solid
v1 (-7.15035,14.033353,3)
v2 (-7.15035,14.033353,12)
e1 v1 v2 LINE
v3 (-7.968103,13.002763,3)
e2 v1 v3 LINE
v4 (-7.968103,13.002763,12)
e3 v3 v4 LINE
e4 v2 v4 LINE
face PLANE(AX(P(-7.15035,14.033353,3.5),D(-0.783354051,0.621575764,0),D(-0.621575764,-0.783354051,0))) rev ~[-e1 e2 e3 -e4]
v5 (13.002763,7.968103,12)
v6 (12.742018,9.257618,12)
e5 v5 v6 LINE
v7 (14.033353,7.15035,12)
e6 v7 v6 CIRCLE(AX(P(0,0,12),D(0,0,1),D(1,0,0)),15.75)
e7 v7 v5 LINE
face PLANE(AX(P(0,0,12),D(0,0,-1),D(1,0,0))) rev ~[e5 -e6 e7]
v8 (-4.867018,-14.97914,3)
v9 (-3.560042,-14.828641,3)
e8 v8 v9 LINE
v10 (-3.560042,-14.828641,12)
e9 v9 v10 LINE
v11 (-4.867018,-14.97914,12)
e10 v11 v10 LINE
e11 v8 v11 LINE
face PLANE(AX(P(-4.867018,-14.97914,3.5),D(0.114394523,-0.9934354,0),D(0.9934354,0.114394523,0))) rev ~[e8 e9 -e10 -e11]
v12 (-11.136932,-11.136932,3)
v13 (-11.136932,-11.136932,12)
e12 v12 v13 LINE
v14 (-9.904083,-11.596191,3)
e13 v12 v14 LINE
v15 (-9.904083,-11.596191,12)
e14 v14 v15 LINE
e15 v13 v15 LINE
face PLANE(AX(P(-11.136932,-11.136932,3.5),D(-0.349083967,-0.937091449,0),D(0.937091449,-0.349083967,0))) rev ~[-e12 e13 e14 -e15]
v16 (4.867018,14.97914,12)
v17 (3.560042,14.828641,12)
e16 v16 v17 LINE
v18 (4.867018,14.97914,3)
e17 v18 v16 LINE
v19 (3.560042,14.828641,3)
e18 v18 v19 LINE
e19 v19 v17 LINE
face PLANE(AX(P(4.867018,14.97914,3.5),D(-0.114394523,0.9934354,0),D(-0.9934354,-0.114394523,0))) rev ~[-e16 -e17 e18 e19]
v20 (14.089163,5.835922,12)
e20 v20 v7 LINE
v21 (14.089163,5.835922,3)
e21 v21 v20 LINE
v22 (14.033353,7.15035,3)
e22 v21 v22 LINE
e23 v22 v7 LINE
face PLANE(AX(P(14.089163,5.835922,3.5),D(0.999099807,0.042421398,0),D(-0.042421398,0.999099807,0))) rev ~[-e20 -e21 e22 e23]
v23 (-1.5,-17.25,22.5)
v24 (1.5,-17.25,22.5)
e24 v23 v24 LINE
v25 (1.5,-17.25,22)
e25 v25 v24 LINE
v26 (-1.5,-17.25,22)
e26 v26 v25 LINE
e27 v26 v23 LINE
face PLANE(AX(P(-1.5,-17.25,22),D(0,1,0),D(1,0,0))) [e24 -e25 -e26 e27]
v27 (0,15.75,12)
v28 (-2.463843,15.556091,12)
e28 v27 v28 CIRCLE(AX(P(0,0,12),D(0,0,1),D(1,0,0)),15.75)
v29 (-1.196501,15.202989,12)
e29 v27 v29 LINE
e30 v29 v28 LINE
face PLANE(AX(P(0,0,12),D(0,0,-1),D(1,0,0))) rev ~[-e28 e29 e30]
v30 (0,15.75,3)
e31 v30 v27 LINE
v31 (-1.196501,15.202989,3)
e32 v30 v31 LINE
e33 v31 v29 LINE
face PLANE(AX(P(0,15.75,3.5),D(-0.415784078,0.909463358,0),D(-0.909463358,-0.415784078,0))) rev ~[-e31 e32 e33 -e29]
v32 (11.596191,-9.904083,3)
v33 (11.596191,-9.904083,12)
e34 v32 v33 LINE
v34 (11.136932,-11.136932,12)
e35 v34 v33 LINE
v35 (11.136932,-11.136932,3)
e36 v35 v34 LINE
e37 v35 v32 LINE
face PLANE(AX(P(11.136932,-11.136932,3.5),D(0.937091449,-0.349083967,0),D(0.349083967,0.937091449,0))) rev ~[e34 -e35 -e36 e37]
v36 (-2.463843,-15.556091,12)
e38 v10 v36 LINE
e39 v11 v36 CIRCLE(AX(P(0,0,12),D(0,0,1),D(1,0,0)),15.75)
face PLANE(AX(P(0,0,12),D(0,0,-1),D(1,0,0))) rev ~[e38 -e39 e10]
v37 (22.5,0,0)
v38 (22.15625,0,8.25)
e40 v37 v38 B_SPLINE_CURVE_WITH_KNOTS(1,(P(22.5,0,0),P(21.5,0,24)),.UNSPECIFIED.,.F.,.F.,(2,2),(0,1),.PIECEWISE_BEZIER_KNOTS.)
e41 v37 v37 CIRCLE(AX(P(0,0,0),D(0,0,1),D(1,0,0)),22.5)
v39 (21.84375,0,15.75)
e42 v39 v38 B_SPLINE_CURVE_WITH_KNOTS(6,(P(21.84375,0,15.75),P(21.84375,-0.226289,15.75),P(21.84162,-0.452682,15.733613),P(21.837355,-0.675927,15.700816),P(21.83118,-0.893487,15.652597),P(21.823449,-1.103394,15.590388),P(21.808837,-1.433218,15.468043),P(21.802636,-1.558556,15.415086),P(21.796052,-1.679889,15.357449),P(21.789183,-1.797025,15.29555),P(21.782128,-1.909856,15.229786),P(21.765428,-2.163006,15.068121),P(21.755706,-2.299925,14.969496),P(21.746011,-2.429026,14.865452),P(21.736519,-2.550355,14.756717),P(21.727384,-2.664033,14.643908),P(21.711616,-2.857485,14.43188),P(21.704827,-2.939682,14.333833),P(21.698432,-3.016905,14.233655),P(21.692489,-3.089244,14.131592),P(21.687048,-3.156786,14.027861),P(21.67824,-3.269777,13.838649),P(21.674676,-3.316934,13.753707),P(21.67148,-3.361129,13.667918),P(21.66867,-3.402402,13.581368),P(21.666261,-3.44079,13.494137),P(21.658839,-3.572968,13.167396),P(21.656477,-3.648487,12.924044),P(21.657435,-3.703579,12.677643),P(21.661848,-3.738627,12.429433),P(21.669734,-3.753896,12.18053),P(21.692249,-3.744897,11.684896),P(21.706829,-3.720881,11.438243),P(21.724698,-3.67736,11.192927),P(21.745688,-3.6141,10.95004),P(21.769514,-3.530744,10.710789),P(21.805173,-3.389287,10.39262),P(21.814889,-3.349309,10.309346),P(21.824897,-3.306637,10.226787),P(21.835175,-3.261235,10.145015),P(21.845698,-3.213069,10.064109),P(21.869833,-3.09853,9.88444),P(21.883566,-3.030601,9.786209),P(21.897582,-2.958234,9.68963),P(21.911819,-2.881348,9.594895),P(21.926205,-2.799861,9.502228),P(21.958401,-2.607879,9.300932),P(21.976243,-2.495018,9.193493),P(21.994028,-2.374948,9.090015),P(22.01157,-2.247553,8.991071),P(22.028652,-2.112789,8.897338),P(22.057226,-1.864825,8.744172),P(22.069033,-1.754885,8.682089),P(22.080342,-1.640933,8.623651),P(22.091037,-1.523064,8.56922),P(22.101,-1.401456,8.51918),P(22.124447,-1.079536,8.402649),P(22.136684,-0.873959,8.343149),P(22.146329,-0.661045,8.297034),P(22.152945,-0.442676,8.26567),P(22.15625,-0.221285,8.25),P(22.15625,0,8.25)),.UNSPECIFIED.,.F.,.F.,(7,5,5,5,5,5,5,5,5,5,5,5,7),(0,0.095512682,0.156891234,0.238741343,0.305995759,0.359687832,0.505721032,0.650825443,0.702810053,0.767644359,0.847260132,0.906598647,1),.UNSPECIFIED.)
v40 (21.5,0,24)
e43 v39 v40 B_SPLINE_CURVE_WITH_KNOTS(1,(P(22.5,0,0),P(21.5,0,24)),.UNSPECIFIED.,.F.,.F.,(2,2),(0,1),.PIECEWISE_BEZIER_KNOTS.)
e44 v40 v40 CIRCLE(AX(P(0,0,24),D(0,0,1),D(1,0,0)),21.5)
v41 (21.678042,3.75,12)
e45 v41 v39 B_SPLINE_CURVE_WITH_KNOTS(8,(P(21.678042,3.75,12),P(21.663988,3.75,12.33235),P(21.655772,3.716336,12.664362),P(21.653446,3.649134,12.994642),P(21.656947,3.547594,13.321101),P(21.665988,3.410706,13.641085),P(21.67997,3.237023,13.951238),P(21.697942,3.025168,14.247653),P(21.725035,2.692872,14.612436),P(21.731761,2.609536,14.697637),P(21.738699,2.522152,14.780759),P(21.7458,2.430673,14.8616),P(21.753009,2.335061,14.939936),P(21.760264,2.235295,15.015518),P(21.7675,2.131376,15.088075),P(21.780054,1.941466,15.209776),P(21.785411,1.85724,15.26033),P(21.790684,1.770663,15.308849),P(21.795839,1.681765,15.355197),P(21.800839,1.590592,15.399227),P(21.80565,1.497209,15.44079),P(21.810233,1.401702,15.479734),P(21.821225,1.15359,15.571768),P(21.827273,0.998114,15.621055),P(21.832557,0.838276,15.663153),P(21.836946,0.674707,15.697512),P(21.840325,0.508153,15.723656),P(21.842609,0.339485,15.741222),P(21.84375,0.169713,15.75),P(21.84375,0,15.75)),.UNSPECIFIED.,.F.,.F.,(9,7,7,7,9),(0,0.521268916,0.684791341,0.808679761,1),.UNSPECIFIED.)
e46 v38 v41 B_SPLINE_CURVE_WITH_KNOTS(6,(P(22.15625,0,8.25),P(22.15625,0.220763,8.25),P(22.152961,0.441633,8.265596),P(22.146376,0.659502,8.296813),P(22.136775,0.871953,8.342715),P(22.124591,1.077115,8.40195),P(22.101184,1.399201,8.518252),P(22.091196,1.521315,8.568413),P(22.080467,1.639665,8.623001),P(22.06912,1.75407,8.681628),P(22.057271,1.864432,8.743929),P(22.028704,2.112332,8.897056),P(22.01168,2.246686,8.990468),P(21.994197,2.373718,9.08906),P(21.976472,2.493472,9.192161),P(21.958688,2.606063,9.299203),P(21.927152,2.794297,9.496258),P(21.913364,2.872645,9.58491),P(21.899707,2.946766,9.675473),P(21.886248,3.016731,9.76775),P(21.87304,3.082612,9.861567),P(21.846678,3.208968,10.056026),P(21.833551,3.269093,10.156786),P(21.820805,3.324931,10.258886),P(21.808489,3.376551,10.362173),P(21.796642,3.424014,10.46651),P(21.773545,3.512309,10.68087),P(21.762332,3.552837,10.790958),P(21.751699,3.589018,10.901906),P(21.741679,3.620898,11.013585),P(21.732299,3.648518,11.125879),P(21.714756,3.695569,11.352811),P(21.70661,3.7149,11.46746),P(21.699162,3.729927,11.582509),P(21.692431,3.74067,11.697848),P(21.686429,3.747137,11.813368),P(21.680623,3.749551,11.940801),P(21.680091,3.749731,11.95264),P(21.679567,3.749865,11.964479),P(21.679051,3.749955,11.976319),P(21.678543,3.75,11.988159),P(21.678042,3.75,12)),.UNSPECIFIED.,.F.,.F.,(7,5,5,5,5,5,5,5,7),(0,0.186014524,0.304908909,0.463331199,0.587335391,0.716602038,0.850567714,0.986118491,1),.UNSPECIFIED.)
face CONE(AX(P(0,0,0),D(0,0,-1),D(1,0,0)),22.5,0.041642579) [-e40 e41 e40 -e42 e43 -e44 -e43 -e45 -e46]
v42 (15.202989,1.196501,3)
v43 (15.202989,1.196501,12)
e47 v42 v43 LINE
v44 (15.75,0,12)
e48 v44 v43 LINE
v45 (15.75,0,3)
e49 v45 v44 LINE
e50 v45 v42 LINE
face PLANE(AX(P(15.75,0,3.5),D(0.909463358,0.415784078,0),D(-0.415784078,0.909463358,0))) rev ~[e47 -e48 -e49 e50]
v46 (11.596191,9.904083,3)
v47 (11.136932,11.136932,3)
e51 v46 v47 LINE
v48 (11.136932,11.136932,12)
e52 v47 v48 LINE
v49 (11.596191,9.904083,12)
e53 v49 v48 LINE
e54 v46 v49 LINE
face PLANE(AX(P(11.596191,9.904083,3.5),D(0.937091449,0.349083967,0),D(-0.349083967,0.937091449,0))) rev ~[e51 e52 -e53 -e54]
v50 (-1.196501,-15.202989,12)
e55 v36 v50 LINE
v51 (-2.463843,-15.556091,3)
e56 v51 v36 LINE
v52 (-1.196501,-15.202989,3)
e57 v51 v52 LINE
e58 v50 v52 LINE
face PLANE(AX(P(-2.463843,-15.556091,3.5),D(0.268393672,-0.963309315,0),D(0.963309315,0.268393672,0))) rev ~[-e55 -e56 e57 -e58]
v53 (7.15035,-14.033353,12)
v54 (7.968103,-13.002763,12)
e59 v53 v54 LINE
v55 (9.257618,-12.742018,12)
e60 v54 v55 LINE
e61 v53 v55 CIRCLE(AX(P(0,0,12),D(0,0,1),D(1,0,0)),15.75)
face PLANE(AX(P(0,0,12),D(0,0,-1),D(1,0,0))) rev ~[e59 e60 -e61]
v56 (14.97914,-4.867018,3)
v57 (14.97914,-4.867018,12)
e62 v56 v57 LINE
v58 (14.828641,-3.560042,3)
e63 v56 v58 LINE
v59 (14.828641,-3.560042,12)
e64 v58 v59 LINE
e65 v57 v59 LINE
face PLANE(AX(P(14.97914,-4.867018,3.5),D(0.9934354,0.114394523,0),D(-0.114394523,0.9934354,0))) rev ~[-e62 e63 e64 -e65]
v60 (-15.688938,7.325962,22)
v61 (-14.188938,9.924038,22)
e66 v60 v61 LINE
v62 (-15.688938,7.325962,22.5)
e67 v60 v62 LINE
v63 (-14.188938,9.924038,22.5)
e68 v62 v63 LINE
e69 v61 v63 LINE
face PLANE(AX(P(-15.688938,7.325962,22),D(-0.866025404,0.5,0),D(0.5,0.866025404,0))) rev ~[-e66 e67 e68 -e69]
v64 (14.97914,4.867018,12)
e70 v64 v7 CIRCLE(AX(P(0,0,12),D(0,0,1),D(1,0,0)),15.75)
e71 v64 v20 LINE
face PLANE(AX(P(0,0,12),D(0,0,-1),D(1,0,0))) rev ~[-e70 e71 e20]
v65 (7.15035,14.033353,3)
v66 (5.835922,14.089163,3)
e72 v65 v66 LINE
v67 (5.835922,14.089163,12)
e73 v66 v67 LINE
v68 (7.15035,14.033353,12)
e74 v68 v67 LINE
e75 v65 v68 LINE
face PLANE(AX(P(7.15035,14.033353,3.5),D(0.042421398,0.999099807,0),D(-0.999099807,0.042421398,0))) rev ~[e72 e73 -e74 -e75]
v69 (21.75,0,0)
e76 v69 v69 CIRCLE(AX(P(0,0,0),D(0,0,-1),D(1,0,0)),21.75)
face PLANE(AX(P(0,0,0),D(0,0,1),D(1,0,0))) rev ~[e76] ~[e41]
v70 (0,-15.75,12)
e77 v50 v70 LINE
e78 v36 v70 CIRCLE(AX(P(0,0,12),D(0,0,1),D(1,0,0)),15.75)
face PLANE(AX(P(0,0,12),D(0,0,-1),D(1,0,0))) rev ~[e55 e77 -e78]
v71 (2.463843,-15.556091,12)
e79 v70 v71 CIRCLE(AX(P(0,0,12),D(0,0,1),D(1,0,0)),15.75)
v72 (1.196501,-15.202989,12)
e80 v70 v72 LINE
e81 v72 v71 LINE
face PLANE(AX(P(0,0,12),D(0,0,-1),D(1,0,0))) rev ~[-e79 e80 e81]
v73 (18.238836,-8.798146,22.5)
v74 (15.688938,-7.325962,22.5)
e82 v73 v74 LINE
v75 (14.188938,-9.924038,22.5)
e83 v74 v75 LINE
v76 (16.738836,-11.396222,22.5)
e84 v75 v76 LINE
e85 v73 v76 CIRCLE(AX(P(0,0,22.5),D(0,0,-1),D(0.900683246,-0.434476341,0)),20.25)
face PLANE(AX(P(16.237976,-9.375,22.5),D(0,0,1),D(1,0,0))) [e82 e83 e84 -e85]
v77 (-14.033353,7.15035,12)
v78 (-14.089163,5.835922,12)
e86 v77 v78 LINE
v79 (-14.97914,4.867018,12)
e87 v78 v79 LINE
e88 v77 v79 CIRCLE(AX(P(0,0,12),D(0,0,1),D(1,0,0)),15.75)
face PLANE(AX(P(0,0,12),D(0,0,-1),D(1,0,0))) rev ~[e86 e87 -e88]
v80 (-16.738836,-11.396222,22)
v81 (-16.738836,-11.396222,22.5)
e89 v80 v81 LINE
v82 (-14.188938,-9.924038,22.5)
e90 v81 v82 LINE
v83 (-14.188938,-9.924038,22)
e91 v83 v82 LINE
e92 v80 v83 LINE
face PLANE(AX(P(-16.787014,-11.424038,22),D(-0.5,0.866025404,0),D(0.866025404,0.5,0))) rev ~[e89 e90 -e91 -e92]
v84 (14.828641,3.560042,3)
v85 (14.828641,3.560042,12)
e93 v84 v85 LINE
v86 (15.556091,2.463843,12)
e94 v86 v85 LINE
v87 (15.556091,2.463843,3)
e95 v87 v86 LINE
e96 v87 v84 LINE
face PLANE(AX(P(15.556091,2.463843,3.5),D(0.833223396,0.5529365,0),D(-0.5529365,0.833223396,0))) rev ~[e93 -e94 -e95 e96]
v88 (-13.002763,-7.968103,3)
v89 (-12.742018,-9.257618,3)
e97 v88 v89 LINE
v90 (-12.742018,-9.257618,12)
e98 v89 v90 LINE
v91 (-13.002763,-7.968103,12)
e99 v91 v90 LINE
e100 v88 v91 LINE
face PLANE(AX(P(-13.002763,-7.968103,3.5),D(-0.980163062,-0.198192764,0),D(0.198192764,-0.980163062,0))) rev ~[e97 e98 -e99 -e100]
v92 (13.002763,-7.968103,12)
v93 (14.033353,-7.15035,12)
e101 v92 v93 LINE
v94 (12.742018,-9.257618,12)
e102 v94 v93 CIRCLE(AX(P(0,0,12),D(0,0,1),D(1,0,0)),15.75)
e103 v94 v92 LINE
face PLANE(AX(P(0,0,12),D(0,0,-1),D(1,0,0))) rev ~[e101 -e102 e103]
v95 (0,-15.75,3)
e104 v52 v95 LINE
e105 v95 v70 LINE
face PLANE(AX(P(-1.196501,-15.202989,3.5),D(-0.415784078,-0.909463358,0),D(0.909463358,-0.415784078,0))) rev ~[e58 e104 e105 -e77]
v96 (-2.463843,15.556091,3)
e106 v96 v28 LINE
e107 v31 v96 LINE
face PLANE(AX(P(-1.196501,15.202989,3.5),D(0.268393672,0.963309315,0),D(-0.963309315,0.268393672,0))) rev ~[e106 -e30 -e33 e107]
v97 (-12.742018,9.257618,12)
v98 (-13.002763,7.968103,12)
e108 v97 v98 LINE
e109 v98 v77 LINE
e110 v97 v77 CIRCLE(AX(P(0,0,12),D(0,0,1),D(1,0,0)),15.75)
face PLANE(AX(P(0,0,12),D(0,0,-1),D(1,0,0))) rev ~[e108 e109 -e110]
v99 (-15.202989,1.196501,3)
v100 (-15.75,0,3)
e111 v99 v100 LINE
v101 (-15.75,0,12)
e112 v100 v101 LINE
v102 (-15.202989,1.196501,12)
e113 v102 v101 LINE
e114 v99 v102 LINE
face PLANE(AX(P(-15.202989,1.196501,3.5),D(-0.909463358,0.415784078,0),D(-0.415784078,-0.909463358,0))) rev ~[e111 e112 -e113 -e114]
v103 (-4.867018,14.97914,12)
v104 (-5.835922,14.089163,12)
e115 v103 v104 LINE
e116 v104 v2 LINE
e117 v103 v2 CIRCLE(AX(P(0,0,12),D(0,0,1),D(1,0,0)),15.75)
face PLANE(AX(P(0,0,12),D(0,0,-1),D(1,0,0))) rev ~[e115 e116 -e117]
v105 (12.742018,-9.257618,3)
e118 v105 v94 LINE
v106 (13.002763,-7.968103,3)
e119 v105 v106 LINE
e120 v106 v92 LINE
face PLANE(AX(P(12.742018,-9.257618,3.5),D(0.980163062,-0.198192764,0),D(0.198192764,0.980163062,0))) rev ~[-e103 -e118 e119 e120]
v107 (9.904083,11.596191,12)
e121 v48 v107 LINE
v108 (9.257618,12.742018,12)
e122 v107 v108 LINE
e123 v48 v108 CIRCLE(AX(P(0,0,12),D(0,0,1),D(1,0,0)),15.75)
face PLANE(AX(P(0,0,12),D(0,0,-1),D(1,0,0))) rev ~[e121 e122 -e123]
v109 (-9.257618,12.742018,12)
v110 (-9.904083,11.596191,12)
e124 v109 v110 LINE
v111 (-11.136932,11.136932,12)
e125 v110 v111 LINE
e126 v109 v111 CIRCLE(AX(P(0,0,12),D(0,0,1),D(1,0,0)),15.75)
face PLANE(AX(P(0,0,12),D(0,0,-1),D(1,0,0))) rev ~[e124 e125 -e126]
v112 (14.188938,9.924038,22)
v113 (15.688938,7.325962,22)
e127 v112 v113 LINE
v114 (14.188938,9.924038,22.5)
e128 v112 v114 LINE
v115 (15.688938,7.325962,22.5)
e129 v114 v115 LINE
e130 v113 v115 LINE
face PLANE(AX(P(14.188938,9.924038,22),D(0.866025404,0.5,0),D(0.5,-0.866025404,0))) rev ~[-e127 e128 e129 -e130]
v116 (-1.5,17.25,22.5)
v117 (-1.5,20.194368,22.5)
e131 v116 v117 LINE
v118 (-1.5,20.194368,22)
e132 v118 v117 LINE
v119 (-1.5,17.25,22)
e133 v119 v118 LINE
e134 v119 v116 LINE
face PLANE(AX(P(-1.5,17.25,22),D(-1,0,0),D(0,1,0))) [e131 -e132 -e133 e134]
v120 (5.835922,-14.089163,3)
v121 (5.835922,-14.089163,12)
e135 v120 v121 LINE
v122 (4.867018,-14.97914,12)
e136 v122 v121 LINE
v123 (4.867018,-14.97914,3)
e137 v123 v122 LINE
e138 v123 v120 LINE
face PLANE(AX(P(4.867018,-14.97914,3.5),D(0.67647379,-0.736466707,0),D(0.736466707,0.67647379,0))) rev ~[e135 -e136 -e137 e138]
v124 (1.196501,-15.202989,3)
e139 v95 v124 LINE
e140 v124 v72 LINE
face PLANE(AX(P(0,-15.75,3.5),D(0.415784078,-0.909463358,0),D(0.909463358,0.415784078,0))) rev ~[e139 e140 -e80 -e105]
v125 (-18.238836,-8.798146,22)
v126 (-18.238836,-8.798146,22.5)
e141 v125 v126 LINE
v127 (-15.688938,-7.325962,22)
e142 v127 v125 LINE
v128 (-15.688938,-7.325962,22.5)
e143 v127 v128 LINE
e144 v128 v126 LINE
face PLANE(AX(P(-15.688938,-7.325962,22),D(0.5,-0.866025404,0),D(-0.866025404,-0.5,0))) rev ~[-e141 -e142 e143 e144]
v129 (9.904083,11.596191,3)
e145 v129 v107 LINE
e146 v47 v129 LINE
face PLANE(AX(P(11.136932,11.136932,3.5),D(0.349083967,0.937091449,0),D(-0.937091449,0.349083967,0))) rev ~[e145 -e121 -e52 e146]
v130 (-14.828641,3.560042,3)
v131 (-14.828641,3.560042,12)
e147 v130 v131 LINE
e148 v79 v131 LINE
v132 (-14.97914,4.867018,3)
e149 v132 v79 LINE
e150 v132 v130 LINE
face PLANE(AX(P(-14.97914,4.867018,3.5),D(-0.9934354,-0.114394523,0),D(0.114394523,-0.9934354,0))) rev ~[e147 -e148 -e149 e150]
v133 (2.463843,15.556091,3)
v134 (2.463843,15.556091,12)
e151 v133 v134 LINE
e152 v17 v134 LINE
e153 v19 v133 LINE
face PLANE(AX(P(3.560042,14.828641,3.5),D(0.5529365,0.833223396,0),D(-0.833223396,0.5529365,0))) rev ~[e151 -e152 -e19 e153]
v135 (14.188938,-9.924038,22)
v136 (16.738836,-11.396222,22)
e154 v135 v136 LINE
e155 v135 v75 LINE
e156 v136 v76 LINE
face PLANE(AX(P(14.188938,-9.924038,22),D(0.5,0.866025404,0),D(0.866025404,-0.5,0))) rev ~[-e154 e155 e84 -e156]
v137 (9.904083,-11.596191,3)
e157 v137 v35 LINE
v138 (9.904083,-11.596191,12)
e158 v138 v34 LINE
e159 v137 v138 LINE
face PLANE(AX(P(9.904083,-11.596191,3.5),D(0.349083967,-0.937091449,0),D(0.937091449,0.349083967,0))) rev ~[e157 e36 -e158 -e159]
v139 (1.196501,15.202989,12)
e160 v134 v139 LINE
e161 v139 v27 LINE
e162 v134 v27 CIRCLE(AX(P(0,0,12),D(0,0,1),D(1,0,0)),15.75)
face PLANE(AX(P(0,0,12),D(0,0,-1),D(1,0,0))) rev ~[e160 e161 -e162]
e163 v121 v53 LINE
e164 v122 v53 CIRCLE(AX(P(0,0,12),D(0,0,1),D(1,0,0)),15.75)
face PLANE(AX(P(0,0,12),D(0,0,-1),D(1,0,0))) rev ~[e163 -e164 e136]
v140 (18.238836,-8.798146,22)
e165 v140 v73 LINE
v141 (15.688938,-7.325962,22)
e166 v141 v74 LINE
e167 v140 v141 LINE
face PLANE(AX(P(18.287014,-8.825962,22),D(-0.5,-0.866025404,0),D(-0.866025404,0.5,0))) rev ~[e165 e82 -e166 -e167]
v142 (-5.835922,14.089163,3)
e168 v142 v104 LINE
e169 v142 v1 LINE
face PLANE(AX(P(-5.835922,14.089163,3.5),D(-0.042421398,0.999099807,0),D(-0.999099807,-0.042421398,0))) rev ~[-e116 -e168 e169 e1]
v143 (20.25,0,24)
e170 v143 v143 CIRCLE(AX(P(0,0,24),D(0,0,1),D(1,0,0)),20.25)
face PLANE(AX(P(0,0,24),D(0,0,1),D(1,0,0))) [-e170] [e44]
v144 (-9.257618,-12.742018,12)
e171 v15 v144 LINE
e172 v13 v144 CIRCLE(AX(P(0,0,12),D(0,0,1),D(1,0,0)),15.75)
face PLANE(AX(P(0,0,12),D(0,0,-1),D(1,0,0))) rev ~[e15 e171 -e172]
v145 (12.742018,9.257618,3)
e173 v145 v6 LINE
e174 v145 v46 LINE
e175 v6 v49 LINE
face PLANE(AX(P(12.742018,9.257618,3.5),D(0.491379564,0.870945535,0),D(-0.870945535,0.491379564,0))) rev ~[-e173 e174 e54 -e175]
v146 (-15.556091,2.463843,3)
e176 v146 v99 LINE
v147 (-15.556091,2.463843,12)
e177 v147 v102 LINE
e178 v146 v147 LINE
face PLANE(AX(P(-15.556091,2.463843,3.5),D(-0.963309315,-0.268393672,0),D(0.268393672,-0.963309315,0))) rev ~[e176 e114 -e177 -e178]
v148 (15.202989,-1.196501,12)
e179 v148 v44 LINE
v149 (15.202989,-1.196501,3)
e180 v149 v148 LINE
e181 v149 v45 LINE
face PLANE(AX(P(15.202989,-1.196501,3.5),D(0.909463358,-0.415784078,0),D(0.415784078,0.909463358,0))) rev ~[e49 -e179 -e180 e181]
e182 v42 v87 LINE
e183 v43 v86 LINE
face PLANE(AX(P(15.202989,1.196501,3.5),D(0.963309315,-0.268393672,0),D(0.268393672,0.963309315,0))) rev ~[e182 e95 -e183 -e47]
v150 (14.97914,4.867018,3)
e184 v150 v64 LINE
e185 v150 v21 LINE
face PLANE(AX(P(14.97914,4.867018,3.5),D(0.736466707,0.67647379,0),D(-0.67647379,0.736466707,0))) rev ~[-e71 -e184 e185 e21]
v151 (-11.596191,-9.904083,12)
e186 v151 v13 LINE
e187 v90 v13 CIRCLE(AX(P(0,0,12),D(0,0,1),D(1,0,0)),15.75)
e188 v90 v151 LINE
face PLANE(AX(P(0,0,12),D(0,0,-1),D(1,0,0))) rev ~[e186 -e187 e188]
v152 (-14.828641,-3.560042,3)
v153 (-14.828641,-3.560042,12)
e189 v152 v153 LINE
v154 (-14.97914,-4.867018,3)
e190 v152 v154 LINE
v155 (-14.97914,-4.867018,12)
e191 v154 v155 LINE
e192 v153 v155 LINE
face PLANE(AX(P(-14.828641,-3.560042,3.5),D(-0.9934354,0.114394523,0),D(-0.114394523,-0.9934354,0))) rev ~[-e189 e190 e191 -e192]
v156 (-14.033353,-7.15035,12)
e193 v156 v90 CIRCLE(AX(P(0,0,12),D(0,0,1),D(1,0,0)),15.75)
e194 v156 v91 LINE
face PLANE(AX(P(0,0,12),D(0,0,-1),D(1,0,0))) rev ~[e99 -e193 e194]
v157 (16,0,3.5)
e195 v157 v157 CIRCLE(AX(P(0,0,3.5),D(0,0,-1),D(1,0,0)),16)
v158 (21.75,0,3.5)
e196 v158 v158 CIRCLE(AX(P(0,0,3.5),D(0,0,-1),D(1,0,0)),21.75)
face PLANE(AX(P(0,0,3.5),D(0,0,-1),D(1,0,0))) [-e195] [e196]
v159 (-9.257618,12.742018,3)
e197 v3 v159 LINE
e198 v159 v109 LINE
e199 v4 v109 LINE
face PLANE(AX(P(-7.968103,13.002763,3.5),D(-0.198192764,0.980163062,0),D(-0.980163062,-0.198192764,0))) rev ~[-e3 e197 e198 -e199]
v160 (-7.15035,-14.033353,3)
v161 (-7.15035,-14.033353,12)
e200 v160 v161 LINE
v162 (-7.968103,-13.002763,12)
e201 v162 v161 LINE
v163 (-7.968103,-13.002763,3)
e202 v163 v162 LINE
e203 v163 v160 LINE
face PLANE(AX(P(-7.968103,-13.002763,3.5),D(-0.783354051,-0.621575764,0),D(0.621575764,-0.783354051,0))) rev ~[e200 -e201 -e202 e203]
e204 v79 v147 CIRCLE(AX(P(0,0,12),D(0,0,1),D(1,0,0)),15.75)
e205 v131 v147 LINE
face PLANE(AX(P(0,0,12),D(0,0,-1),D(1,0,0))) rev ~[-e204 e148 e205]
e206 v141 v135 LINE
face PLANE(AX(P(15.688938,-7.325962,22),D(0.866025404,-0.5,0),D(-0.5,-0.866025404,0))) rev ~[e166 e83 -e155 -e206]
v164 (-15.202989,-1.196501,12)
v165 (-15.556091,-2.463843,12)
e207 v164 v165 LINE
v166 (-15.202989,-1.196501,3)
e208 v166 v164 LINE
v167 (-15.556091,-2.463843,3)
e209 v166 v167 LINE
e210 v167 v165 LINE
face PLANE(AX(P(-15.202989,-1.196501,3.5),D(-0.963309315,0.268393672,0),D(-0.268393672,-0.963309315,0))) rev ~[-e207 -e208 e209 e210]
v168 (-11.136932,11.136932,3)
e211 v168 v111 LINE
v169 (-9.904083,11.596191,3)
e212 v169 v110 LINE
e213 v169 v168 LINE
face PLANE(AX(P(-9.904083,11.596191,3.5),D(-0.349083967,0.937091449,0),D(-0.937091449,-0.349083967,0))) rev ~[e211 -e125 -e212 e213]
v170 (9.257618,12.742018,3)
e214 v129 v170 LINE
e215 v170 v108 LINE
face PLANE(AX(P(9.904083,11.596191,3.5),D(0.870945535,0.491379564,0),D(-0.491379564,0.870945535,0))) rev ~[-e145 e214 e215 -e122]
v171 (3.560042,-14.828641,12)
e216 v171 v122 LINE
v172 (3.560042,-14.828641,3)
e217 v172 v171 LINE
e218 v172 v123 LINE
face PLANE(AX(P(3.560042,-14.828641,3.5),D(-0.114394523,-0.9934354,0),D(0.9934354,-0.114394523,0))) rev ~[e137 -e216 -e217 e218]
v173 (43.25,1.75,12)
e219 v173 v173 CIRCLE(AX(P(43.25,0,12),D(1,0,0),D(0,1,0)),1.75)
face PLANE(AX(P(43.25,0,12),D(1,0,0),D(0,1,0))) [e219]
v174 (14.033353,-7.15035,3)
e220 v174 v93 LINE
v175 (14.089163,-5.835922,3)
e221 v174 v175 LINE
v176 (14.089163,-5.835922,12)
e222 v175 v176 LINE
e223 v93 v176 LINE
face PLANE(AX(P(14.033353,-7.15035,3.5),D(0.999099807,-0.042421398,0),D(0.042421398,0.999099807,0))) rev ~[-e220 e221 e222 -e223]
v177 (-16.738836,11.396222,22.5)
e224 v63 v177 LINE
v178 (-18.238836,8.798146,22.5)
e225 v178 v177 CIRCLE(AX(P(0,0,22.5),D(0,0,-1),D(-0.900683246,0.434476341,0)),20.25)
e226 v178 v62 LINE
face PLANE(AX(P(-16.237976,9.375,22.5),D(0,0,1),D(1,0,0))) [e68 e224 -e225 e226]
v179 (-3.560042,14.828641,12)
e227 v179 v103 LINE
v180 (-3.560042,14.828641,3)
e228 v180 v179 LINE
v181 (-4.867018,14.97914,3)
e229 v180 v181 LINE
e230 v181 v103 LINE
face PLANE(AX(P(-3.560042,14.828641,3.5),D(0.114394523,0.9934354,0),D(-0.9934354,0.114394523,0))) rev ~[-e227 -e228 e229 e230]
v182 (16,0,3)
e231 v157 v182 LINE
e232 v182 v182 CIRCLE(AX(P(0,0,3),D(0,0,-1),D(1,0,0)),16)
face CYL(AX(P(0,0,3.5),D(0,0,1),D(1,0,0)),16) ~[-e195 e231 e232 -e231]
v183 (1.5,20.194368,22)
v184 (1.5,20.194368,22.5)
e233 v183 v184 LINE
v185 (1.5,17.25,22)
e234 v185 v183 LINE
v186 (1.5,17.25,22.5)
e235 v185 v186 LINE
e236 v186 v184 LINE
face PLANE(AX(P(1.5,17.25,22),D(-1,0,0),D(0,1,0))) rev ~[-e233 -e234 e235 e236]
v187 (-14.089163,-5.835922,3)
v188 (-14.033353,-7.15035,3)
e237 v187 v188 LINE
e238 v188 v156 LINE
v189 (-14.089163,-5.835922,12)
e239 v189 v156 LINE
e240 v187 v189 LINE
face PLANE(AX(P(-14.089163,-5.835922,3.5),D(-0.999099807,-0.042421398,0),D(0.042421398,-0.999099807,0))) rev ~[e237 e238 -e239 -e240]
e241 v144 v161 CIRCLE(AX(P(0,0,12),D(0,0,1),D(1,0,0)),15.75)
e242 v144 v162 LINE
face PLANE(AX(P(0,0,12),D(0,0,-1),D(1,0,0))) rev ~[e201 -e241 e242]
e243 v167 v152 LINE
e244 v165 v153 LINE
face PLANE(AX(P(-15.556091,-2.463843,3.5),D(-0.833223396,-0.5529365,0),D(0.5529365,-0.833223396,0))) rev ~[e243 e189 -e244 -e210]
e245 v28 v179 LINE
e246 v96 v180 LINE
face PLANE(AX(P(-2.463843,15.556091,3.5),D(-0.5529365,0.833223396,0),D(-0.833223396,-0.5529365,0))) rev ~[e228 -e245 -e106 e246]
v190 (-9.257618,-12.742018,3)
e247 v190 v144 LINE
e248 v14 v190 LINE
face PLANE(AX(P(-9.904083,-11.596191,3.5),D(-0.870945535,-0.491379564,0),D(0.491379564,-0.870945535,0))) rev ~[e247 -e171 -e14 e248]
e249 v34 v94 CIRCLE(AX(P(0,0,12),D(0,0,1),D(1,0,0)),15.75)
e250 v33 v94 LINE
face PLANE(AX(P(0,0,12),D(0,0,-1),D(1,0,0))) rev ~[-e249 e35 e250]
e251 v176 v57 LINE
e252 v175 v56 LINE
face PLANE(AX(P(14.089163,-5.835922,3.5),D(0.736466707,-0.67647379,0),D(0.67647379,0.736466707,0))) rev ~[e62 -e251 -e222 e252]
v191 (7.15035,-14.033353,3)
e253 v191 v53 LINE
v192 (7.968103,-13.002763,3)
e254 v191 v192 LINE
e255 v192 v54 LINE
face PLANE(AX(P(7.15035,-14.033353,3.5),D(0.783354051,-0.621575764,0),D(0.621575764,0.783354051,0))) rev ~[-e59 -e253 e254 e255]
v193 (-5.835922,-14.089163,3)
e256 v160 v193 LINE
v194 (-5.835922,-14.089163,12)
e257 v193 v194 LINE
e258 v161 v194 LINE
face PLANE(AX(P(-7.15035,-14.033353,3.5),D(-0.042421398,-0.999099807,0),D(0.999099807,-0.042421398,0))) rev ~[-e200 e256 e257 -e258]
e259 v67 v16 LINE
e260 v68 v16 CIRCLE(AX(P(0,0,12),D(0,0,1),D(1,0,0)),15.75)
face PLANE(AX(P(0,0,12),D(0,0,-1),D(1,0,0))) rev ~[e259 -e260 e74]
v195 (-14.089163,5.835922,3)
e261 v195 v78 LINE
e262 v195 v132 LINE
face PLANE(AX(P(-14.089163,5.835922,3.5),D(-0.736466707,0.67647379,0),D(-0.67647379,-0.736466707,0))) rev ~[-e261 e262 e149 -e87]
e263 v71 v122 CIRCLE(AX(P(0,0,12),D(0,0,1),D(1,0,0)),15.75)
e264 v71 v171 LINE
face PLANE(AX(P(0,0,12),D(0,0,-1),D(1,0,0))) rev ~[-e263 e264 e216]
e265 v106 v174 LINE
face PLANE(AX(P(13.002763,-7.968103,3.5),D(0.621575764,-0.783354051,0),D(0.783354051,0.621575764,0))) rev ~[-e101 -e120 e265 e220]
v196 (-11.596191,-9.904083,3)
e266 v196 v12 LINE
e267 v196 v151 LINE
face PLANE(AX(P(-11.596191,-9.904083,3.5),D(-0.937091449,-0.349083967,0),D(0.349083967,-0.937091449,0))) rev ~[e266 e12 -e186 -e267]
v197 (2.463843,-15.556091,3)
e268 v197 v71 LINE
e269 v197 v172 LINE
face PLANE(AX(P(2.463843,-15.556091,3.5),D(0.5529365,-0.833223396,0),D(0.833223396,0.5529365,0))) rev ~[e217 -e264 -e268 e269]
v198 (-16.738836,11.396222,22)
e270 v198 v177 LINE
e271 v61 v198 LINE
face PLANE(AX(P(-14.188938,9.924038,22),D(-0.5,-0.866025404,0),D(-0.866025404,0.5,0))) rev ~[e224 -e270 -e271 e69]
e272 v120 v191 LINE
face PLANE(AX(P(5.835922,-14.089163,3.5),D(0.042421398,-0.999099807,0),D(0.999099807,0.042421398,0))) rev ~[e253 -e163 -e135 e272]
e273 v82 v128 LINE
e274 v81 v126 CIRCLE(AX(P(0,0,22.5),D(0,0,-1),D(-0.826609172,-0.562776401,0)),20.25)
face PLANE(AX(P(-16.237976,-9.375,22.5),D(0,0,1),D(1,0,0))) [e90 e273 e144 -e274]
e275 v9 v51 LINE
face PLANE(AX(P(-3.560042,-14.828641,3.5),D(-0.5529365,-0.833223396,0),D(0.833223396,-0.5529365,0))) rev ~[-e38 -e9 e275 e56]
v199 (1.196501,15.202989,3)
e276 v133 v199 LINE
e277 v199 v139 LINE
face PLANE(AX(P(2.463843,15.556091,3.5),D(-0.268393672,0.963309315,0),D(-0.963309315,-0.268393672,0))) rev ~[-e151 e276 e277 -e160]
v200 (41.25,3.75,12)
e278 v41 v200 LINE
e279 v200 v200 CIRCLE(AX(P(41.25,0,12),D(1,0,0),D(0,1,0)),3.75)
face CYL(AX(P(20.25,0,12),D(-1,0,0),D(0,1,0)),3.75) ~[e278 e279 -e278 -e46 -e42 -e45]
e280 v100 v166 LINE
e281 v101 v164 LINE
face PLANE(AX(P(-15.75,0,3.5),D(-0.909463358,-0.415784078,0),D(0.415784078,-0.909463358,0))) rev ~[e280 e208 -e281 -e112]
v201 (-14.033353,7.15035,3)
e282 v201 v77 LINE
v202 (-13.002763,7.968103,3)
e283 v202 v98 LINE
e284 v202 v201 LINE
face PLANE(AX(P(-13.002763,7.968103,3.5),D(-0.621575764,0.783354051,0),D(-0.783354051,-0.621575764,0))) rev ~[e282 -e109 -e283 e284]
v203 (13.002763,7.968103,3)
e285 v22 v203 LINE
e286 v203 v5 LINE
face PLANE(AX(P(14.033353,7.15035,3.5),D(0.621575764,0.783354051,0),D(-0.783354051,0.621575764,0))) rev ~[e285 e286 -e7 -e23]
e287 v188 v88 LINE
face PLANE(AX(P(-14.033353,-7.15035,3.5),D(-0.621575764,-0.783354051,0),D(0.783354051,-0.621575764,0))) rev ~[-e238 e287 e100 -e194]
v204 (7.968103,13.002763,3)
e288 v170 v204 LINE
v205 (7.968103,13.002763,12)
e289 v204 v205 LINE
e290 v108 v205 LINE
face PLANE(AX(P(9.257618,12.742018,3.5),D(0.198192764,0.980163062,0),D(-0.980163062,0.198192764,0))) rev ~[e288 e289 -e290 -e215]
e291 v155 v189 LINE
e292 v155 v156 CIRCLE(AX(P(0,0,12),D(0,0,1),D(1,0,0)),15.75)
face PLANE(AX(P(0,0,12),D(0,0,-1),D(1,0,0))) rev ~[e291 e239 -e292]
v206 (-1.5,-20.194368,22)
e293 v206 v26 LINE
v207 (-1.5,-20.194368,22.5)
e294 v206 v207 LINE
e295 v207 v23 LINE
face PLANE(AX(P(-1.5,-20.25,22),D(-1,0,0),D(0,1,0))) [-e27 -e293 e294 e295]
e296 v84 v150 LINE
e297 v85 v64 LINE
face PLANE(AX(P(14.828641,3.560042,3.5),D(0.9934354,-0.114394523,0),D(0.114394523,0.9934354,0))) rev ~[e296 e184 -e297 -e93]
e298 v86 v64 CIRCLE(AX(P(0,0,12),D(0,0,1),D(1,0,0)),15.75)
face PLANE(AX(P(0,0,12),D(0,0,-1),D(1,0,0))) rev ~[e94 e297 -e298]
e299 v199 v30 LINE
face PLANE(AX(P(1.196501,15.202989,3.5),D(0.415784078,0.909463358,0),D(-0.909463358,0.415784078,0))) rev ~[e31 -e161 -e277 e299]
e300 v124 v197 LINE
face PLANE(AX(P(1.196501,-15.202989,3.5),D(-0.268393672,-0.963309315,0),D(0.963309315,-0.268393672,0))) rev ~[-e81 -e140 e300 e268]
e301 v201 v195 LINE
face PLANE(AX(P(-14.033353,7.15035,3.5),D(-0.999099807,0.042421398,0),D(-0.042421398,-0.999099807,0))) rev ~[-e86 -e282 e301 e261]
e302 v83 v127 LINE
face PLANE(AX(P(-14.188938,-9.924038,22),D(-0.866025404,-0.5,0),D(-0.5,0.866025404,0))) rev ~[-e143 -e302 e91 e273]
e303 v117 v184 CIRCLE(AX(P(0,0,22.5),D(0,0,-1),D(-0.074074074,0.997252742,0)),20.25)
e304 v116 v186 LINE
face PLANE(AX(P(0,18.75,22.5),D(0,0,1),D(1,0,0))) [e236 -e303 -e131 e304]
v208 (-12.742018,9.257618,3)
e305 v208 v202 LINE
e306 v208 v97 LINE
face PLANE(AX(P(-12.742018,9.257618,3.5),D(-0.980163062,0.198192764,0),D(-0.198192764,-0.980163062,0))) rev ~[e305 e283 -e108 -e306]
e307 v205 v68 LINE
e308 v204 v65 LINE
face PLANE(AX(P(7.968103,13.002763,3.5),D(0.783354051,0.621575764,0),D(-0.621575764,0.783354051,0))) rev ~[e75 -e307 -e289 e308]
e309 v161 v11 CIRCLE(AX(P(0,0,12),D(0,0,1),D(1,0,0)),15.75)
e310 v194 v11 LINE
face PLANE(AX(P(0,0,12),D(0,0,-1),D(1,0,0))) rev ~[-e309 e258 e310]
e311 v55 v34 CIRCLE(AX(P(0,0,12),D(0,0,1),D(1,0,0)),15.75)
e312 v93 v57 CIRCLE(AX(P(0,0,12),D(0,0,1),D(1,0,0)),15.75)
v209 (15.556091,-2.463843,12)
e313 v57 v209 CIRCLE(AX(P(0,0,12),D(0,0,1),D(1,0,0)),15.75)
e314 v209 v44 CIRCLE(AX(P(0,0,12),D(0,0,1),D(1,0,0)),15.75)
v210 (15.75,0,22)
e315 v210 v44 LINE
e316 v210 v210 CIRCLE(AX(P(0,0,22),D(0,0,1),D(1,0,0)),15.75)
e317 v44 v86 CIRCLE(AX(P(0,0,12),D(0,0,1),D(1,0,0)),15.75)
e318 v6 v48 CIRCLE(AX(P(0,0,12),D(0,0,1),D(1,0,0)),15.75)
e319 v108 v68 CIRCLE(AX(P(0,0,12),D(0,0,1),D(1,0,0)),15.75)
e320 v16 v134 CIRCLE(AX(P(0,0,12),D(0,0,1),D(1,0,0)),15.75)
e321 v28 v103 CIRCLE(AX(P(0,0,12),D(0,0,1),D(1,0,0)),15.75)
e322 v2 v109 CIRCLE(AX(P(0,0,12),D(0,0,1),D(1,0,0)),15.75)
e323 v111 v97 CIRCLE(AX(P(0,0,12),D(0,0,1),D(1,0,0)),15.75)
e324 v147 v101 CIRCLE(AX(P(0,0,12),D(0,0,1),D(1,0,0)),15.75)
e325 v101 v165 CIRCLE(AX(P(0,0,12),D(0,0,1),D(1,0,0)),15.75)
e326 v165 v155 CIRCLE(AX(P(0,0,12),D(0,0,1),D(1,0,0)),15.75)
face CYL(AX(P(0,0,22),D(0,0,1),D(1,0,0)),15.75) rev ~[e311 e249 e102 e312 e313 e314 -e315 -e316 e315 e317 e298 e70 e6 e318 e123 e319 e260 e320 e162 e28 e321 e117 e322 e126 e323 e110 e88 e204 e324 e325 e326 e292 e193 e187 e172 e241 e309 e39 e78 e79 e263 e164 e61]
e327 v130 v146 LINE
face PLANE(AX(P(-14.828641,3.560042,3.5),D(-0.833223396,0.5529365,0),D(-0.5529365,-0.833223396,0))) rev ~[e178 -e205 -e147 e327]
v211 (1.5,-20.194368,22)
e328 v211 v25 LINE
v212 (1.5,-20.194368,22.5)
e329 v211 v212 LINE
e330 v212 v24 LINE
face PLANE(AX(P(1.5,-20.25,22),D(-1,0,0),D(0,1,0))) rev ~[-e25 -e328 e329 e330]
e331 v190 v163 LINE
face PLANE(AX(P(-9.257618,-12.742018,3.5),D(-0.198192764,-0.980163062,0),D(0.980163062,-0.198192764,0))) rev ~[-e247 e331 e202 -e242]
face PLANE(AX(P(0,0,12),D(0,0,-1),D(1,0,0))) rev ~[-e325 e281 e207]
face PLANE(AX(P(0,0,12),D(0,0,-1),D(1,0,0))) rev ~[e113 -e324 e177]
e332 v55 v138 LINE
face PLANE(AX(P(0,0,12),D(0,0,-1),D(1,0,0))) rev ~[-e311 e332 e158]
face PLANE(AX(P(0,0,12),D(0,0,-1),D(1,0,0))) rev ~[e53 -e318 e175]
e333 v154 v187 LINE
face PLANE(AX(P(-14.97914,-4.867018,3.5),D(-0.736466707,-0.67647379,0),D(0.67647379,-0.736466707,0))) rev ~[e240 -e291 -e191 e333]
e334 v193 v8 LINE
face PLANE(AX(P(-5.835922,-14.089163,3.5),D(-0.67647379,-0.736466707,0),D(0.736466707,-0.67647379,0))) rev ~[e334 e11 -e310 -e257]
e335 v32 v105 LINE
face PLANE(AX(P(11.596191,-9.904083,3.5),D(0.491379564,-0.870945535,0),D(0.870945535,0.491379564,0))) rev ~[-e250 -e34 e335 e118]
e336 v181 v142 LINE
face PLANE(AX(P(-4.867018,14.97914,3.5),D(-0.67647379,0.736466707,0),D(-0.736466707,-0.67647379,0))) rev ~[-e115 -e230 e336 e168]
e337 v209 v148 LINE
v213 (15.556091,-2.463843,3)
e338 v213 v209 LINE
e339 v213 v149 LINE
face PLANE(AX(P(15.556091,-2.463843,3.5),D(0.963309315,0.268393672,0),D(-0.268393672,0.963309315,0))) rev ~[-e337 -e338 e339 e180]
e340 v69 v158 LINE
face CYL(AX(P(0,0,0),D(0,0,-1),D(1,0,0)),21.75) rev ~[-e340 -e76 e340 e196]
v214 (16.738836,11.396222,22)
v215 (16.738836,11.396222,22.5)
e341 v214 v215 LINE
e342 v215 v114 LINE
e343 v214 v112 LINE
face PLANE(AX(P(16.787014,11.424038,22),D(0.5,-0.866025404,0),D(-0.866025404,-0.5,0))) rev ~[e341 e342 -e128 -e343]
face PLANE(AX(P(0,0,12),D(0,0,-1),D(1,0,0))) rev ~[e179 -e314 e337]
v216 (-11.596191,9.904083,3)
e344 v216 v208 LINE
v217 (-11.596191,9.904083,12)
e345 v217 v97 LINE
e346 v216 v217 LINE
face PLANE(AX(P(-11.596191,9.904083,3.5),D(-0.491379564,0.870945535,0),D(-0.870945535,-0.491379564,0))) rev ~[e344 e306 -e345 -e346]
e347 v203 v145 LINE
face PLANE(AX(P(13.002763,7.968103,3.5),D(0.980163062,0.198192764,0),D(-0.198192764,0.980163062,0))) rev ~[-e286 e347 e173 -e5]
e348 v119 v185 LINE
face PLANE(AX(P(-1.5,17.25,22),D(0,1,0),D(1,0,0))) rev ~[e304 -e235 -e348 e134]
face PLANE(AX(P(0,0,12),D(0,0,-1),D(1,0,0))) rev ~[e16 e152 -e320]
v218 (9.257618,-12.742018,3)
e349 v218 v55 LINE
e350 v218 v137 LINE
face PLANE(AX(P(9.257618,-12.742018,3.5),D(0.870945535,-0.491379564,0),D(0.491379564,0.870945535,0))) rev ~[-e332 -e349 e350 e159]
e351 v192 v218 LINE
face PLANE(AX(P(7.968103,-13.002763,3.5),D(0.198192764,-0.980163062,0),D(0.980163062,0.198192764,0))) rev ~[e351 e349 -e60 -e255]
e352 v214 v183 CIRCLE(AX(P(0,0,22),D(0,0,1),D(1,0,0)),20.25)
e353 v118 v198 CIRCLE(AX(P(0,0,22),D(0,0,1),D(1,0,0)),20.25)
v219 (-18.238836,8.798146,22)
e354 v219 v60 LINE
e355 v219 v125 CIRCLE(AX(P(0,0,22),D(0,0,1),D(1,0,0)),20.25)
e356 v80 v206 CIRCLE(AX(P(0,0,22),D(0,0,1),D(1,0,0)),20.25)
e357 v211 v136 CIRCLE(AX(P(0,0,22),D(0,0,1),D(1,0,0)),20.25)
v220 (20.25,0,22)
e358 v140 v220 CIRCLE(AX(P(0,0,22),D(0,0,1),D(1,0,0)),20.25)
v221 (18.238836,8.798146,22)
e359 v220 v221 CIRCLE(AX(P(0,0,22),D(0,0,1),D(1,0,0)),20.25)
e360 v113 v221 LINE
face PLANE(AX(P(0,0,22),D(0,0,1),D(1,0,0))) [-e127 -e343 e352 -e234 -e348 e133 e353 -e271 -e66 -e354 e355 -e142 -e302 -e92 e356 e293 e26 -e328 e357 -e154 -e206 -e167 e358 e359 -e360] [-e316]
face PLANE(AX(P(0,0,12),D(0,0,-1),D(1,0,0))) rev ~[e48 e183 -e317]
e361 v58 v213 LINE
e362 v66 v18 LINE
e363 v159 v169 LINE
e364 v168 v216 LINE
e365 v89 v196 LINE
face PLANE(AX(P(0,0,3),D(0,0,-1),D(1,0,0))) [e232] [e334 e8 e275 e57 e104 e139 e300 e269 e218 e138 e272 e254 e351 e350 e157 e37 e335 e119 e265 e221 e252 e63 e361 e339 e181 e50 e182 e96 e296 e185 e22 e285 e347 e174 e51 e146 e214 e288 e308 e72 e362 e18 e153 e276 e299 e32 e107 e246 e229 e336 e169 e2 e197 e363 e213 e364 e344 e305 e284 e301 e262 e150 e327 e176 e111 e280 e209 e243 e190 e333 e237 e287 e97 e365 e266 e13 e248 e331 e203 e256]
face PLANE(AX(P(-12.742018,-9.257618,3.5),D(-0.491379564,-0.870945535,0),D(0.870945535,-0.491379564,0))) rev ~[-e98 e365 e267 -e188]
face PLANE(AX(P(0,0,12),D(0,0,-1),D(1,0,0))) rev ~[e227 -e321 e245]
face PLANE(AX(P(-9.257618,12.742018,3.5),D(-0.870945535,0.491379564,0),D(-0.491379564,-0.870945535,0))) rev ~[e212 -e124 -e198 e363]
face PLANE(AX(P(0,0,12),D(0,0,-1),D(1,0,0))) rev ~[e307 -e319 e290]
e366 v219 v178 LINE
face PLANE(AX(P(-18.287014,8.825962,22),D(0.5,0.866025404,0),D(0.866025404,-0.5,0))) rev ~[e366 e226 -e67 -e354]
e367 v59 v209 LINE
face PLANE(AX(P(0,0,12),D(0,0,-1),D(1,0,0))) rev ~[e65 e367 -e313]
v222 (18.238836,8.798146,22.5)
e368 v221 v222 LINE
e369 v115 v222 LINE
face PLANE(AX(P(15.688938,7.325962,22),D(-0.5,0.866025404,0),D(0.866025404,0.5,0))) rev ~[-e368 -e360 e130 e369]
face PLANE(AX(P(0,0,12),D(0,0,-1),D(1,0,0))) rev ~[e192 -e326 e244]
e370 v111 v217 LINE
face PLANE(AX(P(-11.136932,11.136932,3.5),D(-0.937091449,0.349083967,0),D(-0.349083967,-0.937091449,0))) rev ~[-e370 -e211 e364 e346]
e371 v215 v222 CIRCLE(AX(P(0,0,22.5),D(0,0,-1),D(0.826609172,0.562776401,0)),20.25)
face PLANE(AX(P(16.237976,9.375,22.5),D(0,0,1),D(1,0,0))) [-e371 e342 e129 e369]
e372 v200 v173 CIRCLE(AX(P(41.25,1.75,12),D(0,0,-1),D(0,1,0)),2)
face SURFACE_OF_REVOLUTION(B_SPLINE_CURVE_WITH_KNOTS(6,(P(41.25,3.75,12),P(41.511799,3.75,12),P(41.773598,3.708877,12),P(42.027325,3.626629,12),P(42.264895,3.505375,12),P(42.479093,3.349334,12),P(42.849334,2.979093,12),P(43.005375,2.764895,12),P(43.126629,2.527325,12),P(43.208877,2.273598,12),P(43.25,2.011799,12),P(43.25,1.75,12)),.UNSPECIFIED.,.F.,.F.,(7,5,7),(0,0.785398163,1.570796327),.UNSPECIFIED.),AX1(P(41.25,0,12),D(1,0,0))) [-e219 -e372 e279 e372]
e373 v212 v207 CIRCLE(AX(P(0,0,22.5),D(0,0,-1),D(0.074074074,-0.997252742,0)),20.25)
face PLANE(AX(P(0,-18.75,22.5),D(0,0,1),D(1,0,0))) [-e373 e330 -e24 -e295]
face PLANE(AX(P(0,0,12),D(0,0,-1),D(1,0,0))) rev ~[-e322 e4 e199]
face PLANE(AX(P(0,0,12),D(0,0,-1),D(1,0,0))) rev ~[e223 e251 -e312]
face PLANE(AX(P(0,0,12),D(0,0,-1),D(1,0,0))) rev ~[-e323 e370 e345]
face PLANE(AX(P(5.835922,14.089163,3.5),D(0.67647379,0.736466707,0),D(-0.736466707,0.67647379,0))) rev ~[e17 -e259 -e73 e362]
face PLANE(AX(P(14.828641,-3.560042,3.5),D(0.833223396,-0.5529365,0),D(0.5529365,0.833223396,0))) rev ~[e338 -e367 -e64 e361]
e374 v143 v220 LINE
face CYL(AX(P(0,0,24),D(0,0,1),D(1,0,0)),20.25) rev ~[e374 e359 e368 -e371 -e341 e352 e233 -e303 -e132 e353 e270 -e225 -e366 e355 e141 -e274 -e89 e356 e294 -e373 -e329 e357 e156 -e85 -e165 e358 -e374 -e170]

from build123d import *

# Parameters (mm, degrees)
F0_R           = 22.5
F2_R           = 21.5
F4_R           = 20.25
F5_DEPTH       = 2
F6_R           = 21.75
F7_DEPTH       = 3.5
F8_R           = 15.75
F9_DEPTH       = 18.5
F10_W          = 3
F10_H          = 3
F11_DEPTH      = 0.5
F14_R          = 16
F15_DEPTH      = 8.5
F15_DEPTH_BACK = 0.5
F18_R          = 3.75
F19_DEPTH      = 23
F20_R          = 2


with BuildPart() as f3:
    # F0 (on Top) → F3 section 0
    with BuildSketch(Plane.XY):
        Circle(F0_R)
    # F2 (on offset) → F3 section 1
    with BuildSketch(Plane.XY.offset(24)):
        Circle(F2_R)
    loft()

    # F4 (on face) → F5 (cut)
    with BuildSketch(Plane.XY.offset(24)):
        Circle(F4_R)
    extrude(amount=-F5_DEPTH, mode=Mode.SUBTRACT)

    # F6 (on face) → F7 (cut)
    with BuildSketch(Plane(origin=(0, 0, 0), x_dir=(1, 0, 0), z_dir=(0, 0, -1))):
        Circle(F6_R)
    extrude(amount=-F7_DEPTH, mode=Mode.SUBTRACT)

    # F8 (on face) → F9 (cut, through all)
    with BuildSketch(Plane.XY.offset(22)):
        Circle(F8_R)
    extrude(amount=-F9_DEPTH, mode=Mode.SUBTRACT)

    # F10 (on face) → F11 (join)
    with BuildSketch(Plane.XY.offset(22)):
        with Locations((0, 18.75)):
            Rectangle(F10_W, F10_H)
        Polygon((-15.6889382153, 7.3259618943), (-14.1889382153, 9.9240381057), (-16.7870144266, 11.4240381057), (-18.2870144266, 8.8259618943), align=None)
        Polygon((-14.1889382153, -9.9240381057), (-15.6889382153, -7.3259618943), (-18.2870144266, -8.8259618943), (-16.7870144266, -11.4240381057), align=None)
        with Locations((0, -18.75)):
            Rectangle(F10_W, F10_H)
        Polygon((15.6889382153, -7.3259618943), (14.1889382153, -9.9240381057), (16.7870144266, -11.4240381057), (18.2870144266, -8.8259618943), align=None)
        Polygon((14.1889382153, 9.9240381057), (15.6889382153, 7.3259618943), (18.2870144266, 8.8259618943), (16.7870144266, 11.4240381057), align=None)
    extrude(amount=F11_DEPTH)

    # F14 (on face) → F15 (join, two sides)
    with BuildSketch(Plane(origin=(0, 0, 3.5), x_dir=(1, 0, 0), z_dir=(0, 0, -1))) as f15_sk:
        Circle(F14_R)
        Polygon((-1.1965012098, 15.2029893394), (0, 15.75), (1.1965012098, 15.2029893394), (2.4638428244, 15.5560913644), (3.5600417988, 14.8286412861), (4.8670176614, 14.9791401316), (5.8359223436, 14.0891628708), (7.1503503709, 14.033352756), (7.9681031119, 13.0027625064), (9.2576177236, 12.7420176614), (9.904082737, 11.5961909754), (11.1369318037, 11.1369318037), (11.5961909754, 9.904082737), (12.7420176614, 9.2576177236), (13.0027625064, 7.9681031119), (14.033352756, 7.1503503709), (14.0891628708, 5.8359223436), (14.9791401316, 4.8670176614), (14.8286412861, 3.5600417988), (15.5560913644, 2.4638428244), (15.2029893394, 1.1965012098), (15.75, 0), (15.2029893394, -1.1965012098), (15.5560913644, -2.4638428244), (14.8286412861, -3.5600417988), (14.9791401316, -4.8670176614), (14.0891628708, -5.8359223436), (14.033352756, -7.1503503709), (13.0027625064, -7.9681031119), (12.7420176614, -9.2576177236), (11.5961909754, -9.904082737), (11.1369318037, -11.1369318037), (9.904082737, -11.5961909754), (9.2576177236, -12.7420176614), (7.9681031119, -13.0027625064), (7.1503503709, -14.033352756), (5.8359223436, -14.0891628708), (4.8670176614, -14.9791401316), (3.5600417988, -14.8286412861), (2.4638428244, -15.5560913644), (1.1965012098, -15.2029893394), (0, -15.75), (-1.1965012098, -15.2029893394), (-2.4638428244, -15.5560913644), (-3.5600417988, -14.8286412861), (-4.8670176614, -14.9791401316), (-5.8359223436, -14.0891628708), (-7.1503503709, -14.033352756), (-7.9681031119, -13.0027625064), (-9.2576177236, -12.7420176614), (-9.904082737, -11.5961909754), (-11.1369318037, -11.1369318037), (-11.5961909754, -9.904082737), (-12.7420176614, -9.2576177236), (-13.0027625064, -7.9681031119), (-14.033352756, -7.1503503709), (-14.0891628708, -5.8359223436), (-14.9791401316, -4.8670176614), (-14.8286412861, -3.5600417988), (-15.5560913644, -2.4638428244), (-15.2029893394, -1.1965012098), (-15.75, 0), (-15.2029893394, 1.1965012098), (-15.5560913644, 2.4638428244), (-14.8286412861, 3.5600417988), (-14.9791401316, 4.8670176614), (-14.0891628708, 5.8359223436), (-14.033352756, 7.1503503709), (-13.0027625064, 7.9681031119), (-12.7420176614, 9.2576177236), (-11.5961909754, 9.904082737), (-11.1369318037, 11.1369318037), (-9.904082737, 11.5961909754), (-9.2576177236, 12.7420176614), (-7.9681031119, 13.0027625064), (-7.1503503709, 14.033352756), (-5.8359223436, 14.0891628708), (-4.8670176614, 14.9791401316), (-3.5600417988, 14.8286412861), (-2.4638428244, 15.5560913644), align=None, mode=Mode.SUBTRACT)
    extrude(amount=-F15_DEPTH)
    extrude(f15_sk.sketch, amount=F15_DEPTH_BACK)

    # F18 (on offset) → F19 (join)
    with BuildSketch(Plane.YZ.offset(20.25)):
        with Locations((0, 12)):
            Circle(F18_R)
    extrude(amount=F19_DEPTH)

    # F20
    f20_edges = [f3.edges().sort_by_distance(p)[0] for p in [
        (43.25, -3.75, 12),
    ]]
    fillet(f20_edges, radius=F20_R)


solid = f3.part
